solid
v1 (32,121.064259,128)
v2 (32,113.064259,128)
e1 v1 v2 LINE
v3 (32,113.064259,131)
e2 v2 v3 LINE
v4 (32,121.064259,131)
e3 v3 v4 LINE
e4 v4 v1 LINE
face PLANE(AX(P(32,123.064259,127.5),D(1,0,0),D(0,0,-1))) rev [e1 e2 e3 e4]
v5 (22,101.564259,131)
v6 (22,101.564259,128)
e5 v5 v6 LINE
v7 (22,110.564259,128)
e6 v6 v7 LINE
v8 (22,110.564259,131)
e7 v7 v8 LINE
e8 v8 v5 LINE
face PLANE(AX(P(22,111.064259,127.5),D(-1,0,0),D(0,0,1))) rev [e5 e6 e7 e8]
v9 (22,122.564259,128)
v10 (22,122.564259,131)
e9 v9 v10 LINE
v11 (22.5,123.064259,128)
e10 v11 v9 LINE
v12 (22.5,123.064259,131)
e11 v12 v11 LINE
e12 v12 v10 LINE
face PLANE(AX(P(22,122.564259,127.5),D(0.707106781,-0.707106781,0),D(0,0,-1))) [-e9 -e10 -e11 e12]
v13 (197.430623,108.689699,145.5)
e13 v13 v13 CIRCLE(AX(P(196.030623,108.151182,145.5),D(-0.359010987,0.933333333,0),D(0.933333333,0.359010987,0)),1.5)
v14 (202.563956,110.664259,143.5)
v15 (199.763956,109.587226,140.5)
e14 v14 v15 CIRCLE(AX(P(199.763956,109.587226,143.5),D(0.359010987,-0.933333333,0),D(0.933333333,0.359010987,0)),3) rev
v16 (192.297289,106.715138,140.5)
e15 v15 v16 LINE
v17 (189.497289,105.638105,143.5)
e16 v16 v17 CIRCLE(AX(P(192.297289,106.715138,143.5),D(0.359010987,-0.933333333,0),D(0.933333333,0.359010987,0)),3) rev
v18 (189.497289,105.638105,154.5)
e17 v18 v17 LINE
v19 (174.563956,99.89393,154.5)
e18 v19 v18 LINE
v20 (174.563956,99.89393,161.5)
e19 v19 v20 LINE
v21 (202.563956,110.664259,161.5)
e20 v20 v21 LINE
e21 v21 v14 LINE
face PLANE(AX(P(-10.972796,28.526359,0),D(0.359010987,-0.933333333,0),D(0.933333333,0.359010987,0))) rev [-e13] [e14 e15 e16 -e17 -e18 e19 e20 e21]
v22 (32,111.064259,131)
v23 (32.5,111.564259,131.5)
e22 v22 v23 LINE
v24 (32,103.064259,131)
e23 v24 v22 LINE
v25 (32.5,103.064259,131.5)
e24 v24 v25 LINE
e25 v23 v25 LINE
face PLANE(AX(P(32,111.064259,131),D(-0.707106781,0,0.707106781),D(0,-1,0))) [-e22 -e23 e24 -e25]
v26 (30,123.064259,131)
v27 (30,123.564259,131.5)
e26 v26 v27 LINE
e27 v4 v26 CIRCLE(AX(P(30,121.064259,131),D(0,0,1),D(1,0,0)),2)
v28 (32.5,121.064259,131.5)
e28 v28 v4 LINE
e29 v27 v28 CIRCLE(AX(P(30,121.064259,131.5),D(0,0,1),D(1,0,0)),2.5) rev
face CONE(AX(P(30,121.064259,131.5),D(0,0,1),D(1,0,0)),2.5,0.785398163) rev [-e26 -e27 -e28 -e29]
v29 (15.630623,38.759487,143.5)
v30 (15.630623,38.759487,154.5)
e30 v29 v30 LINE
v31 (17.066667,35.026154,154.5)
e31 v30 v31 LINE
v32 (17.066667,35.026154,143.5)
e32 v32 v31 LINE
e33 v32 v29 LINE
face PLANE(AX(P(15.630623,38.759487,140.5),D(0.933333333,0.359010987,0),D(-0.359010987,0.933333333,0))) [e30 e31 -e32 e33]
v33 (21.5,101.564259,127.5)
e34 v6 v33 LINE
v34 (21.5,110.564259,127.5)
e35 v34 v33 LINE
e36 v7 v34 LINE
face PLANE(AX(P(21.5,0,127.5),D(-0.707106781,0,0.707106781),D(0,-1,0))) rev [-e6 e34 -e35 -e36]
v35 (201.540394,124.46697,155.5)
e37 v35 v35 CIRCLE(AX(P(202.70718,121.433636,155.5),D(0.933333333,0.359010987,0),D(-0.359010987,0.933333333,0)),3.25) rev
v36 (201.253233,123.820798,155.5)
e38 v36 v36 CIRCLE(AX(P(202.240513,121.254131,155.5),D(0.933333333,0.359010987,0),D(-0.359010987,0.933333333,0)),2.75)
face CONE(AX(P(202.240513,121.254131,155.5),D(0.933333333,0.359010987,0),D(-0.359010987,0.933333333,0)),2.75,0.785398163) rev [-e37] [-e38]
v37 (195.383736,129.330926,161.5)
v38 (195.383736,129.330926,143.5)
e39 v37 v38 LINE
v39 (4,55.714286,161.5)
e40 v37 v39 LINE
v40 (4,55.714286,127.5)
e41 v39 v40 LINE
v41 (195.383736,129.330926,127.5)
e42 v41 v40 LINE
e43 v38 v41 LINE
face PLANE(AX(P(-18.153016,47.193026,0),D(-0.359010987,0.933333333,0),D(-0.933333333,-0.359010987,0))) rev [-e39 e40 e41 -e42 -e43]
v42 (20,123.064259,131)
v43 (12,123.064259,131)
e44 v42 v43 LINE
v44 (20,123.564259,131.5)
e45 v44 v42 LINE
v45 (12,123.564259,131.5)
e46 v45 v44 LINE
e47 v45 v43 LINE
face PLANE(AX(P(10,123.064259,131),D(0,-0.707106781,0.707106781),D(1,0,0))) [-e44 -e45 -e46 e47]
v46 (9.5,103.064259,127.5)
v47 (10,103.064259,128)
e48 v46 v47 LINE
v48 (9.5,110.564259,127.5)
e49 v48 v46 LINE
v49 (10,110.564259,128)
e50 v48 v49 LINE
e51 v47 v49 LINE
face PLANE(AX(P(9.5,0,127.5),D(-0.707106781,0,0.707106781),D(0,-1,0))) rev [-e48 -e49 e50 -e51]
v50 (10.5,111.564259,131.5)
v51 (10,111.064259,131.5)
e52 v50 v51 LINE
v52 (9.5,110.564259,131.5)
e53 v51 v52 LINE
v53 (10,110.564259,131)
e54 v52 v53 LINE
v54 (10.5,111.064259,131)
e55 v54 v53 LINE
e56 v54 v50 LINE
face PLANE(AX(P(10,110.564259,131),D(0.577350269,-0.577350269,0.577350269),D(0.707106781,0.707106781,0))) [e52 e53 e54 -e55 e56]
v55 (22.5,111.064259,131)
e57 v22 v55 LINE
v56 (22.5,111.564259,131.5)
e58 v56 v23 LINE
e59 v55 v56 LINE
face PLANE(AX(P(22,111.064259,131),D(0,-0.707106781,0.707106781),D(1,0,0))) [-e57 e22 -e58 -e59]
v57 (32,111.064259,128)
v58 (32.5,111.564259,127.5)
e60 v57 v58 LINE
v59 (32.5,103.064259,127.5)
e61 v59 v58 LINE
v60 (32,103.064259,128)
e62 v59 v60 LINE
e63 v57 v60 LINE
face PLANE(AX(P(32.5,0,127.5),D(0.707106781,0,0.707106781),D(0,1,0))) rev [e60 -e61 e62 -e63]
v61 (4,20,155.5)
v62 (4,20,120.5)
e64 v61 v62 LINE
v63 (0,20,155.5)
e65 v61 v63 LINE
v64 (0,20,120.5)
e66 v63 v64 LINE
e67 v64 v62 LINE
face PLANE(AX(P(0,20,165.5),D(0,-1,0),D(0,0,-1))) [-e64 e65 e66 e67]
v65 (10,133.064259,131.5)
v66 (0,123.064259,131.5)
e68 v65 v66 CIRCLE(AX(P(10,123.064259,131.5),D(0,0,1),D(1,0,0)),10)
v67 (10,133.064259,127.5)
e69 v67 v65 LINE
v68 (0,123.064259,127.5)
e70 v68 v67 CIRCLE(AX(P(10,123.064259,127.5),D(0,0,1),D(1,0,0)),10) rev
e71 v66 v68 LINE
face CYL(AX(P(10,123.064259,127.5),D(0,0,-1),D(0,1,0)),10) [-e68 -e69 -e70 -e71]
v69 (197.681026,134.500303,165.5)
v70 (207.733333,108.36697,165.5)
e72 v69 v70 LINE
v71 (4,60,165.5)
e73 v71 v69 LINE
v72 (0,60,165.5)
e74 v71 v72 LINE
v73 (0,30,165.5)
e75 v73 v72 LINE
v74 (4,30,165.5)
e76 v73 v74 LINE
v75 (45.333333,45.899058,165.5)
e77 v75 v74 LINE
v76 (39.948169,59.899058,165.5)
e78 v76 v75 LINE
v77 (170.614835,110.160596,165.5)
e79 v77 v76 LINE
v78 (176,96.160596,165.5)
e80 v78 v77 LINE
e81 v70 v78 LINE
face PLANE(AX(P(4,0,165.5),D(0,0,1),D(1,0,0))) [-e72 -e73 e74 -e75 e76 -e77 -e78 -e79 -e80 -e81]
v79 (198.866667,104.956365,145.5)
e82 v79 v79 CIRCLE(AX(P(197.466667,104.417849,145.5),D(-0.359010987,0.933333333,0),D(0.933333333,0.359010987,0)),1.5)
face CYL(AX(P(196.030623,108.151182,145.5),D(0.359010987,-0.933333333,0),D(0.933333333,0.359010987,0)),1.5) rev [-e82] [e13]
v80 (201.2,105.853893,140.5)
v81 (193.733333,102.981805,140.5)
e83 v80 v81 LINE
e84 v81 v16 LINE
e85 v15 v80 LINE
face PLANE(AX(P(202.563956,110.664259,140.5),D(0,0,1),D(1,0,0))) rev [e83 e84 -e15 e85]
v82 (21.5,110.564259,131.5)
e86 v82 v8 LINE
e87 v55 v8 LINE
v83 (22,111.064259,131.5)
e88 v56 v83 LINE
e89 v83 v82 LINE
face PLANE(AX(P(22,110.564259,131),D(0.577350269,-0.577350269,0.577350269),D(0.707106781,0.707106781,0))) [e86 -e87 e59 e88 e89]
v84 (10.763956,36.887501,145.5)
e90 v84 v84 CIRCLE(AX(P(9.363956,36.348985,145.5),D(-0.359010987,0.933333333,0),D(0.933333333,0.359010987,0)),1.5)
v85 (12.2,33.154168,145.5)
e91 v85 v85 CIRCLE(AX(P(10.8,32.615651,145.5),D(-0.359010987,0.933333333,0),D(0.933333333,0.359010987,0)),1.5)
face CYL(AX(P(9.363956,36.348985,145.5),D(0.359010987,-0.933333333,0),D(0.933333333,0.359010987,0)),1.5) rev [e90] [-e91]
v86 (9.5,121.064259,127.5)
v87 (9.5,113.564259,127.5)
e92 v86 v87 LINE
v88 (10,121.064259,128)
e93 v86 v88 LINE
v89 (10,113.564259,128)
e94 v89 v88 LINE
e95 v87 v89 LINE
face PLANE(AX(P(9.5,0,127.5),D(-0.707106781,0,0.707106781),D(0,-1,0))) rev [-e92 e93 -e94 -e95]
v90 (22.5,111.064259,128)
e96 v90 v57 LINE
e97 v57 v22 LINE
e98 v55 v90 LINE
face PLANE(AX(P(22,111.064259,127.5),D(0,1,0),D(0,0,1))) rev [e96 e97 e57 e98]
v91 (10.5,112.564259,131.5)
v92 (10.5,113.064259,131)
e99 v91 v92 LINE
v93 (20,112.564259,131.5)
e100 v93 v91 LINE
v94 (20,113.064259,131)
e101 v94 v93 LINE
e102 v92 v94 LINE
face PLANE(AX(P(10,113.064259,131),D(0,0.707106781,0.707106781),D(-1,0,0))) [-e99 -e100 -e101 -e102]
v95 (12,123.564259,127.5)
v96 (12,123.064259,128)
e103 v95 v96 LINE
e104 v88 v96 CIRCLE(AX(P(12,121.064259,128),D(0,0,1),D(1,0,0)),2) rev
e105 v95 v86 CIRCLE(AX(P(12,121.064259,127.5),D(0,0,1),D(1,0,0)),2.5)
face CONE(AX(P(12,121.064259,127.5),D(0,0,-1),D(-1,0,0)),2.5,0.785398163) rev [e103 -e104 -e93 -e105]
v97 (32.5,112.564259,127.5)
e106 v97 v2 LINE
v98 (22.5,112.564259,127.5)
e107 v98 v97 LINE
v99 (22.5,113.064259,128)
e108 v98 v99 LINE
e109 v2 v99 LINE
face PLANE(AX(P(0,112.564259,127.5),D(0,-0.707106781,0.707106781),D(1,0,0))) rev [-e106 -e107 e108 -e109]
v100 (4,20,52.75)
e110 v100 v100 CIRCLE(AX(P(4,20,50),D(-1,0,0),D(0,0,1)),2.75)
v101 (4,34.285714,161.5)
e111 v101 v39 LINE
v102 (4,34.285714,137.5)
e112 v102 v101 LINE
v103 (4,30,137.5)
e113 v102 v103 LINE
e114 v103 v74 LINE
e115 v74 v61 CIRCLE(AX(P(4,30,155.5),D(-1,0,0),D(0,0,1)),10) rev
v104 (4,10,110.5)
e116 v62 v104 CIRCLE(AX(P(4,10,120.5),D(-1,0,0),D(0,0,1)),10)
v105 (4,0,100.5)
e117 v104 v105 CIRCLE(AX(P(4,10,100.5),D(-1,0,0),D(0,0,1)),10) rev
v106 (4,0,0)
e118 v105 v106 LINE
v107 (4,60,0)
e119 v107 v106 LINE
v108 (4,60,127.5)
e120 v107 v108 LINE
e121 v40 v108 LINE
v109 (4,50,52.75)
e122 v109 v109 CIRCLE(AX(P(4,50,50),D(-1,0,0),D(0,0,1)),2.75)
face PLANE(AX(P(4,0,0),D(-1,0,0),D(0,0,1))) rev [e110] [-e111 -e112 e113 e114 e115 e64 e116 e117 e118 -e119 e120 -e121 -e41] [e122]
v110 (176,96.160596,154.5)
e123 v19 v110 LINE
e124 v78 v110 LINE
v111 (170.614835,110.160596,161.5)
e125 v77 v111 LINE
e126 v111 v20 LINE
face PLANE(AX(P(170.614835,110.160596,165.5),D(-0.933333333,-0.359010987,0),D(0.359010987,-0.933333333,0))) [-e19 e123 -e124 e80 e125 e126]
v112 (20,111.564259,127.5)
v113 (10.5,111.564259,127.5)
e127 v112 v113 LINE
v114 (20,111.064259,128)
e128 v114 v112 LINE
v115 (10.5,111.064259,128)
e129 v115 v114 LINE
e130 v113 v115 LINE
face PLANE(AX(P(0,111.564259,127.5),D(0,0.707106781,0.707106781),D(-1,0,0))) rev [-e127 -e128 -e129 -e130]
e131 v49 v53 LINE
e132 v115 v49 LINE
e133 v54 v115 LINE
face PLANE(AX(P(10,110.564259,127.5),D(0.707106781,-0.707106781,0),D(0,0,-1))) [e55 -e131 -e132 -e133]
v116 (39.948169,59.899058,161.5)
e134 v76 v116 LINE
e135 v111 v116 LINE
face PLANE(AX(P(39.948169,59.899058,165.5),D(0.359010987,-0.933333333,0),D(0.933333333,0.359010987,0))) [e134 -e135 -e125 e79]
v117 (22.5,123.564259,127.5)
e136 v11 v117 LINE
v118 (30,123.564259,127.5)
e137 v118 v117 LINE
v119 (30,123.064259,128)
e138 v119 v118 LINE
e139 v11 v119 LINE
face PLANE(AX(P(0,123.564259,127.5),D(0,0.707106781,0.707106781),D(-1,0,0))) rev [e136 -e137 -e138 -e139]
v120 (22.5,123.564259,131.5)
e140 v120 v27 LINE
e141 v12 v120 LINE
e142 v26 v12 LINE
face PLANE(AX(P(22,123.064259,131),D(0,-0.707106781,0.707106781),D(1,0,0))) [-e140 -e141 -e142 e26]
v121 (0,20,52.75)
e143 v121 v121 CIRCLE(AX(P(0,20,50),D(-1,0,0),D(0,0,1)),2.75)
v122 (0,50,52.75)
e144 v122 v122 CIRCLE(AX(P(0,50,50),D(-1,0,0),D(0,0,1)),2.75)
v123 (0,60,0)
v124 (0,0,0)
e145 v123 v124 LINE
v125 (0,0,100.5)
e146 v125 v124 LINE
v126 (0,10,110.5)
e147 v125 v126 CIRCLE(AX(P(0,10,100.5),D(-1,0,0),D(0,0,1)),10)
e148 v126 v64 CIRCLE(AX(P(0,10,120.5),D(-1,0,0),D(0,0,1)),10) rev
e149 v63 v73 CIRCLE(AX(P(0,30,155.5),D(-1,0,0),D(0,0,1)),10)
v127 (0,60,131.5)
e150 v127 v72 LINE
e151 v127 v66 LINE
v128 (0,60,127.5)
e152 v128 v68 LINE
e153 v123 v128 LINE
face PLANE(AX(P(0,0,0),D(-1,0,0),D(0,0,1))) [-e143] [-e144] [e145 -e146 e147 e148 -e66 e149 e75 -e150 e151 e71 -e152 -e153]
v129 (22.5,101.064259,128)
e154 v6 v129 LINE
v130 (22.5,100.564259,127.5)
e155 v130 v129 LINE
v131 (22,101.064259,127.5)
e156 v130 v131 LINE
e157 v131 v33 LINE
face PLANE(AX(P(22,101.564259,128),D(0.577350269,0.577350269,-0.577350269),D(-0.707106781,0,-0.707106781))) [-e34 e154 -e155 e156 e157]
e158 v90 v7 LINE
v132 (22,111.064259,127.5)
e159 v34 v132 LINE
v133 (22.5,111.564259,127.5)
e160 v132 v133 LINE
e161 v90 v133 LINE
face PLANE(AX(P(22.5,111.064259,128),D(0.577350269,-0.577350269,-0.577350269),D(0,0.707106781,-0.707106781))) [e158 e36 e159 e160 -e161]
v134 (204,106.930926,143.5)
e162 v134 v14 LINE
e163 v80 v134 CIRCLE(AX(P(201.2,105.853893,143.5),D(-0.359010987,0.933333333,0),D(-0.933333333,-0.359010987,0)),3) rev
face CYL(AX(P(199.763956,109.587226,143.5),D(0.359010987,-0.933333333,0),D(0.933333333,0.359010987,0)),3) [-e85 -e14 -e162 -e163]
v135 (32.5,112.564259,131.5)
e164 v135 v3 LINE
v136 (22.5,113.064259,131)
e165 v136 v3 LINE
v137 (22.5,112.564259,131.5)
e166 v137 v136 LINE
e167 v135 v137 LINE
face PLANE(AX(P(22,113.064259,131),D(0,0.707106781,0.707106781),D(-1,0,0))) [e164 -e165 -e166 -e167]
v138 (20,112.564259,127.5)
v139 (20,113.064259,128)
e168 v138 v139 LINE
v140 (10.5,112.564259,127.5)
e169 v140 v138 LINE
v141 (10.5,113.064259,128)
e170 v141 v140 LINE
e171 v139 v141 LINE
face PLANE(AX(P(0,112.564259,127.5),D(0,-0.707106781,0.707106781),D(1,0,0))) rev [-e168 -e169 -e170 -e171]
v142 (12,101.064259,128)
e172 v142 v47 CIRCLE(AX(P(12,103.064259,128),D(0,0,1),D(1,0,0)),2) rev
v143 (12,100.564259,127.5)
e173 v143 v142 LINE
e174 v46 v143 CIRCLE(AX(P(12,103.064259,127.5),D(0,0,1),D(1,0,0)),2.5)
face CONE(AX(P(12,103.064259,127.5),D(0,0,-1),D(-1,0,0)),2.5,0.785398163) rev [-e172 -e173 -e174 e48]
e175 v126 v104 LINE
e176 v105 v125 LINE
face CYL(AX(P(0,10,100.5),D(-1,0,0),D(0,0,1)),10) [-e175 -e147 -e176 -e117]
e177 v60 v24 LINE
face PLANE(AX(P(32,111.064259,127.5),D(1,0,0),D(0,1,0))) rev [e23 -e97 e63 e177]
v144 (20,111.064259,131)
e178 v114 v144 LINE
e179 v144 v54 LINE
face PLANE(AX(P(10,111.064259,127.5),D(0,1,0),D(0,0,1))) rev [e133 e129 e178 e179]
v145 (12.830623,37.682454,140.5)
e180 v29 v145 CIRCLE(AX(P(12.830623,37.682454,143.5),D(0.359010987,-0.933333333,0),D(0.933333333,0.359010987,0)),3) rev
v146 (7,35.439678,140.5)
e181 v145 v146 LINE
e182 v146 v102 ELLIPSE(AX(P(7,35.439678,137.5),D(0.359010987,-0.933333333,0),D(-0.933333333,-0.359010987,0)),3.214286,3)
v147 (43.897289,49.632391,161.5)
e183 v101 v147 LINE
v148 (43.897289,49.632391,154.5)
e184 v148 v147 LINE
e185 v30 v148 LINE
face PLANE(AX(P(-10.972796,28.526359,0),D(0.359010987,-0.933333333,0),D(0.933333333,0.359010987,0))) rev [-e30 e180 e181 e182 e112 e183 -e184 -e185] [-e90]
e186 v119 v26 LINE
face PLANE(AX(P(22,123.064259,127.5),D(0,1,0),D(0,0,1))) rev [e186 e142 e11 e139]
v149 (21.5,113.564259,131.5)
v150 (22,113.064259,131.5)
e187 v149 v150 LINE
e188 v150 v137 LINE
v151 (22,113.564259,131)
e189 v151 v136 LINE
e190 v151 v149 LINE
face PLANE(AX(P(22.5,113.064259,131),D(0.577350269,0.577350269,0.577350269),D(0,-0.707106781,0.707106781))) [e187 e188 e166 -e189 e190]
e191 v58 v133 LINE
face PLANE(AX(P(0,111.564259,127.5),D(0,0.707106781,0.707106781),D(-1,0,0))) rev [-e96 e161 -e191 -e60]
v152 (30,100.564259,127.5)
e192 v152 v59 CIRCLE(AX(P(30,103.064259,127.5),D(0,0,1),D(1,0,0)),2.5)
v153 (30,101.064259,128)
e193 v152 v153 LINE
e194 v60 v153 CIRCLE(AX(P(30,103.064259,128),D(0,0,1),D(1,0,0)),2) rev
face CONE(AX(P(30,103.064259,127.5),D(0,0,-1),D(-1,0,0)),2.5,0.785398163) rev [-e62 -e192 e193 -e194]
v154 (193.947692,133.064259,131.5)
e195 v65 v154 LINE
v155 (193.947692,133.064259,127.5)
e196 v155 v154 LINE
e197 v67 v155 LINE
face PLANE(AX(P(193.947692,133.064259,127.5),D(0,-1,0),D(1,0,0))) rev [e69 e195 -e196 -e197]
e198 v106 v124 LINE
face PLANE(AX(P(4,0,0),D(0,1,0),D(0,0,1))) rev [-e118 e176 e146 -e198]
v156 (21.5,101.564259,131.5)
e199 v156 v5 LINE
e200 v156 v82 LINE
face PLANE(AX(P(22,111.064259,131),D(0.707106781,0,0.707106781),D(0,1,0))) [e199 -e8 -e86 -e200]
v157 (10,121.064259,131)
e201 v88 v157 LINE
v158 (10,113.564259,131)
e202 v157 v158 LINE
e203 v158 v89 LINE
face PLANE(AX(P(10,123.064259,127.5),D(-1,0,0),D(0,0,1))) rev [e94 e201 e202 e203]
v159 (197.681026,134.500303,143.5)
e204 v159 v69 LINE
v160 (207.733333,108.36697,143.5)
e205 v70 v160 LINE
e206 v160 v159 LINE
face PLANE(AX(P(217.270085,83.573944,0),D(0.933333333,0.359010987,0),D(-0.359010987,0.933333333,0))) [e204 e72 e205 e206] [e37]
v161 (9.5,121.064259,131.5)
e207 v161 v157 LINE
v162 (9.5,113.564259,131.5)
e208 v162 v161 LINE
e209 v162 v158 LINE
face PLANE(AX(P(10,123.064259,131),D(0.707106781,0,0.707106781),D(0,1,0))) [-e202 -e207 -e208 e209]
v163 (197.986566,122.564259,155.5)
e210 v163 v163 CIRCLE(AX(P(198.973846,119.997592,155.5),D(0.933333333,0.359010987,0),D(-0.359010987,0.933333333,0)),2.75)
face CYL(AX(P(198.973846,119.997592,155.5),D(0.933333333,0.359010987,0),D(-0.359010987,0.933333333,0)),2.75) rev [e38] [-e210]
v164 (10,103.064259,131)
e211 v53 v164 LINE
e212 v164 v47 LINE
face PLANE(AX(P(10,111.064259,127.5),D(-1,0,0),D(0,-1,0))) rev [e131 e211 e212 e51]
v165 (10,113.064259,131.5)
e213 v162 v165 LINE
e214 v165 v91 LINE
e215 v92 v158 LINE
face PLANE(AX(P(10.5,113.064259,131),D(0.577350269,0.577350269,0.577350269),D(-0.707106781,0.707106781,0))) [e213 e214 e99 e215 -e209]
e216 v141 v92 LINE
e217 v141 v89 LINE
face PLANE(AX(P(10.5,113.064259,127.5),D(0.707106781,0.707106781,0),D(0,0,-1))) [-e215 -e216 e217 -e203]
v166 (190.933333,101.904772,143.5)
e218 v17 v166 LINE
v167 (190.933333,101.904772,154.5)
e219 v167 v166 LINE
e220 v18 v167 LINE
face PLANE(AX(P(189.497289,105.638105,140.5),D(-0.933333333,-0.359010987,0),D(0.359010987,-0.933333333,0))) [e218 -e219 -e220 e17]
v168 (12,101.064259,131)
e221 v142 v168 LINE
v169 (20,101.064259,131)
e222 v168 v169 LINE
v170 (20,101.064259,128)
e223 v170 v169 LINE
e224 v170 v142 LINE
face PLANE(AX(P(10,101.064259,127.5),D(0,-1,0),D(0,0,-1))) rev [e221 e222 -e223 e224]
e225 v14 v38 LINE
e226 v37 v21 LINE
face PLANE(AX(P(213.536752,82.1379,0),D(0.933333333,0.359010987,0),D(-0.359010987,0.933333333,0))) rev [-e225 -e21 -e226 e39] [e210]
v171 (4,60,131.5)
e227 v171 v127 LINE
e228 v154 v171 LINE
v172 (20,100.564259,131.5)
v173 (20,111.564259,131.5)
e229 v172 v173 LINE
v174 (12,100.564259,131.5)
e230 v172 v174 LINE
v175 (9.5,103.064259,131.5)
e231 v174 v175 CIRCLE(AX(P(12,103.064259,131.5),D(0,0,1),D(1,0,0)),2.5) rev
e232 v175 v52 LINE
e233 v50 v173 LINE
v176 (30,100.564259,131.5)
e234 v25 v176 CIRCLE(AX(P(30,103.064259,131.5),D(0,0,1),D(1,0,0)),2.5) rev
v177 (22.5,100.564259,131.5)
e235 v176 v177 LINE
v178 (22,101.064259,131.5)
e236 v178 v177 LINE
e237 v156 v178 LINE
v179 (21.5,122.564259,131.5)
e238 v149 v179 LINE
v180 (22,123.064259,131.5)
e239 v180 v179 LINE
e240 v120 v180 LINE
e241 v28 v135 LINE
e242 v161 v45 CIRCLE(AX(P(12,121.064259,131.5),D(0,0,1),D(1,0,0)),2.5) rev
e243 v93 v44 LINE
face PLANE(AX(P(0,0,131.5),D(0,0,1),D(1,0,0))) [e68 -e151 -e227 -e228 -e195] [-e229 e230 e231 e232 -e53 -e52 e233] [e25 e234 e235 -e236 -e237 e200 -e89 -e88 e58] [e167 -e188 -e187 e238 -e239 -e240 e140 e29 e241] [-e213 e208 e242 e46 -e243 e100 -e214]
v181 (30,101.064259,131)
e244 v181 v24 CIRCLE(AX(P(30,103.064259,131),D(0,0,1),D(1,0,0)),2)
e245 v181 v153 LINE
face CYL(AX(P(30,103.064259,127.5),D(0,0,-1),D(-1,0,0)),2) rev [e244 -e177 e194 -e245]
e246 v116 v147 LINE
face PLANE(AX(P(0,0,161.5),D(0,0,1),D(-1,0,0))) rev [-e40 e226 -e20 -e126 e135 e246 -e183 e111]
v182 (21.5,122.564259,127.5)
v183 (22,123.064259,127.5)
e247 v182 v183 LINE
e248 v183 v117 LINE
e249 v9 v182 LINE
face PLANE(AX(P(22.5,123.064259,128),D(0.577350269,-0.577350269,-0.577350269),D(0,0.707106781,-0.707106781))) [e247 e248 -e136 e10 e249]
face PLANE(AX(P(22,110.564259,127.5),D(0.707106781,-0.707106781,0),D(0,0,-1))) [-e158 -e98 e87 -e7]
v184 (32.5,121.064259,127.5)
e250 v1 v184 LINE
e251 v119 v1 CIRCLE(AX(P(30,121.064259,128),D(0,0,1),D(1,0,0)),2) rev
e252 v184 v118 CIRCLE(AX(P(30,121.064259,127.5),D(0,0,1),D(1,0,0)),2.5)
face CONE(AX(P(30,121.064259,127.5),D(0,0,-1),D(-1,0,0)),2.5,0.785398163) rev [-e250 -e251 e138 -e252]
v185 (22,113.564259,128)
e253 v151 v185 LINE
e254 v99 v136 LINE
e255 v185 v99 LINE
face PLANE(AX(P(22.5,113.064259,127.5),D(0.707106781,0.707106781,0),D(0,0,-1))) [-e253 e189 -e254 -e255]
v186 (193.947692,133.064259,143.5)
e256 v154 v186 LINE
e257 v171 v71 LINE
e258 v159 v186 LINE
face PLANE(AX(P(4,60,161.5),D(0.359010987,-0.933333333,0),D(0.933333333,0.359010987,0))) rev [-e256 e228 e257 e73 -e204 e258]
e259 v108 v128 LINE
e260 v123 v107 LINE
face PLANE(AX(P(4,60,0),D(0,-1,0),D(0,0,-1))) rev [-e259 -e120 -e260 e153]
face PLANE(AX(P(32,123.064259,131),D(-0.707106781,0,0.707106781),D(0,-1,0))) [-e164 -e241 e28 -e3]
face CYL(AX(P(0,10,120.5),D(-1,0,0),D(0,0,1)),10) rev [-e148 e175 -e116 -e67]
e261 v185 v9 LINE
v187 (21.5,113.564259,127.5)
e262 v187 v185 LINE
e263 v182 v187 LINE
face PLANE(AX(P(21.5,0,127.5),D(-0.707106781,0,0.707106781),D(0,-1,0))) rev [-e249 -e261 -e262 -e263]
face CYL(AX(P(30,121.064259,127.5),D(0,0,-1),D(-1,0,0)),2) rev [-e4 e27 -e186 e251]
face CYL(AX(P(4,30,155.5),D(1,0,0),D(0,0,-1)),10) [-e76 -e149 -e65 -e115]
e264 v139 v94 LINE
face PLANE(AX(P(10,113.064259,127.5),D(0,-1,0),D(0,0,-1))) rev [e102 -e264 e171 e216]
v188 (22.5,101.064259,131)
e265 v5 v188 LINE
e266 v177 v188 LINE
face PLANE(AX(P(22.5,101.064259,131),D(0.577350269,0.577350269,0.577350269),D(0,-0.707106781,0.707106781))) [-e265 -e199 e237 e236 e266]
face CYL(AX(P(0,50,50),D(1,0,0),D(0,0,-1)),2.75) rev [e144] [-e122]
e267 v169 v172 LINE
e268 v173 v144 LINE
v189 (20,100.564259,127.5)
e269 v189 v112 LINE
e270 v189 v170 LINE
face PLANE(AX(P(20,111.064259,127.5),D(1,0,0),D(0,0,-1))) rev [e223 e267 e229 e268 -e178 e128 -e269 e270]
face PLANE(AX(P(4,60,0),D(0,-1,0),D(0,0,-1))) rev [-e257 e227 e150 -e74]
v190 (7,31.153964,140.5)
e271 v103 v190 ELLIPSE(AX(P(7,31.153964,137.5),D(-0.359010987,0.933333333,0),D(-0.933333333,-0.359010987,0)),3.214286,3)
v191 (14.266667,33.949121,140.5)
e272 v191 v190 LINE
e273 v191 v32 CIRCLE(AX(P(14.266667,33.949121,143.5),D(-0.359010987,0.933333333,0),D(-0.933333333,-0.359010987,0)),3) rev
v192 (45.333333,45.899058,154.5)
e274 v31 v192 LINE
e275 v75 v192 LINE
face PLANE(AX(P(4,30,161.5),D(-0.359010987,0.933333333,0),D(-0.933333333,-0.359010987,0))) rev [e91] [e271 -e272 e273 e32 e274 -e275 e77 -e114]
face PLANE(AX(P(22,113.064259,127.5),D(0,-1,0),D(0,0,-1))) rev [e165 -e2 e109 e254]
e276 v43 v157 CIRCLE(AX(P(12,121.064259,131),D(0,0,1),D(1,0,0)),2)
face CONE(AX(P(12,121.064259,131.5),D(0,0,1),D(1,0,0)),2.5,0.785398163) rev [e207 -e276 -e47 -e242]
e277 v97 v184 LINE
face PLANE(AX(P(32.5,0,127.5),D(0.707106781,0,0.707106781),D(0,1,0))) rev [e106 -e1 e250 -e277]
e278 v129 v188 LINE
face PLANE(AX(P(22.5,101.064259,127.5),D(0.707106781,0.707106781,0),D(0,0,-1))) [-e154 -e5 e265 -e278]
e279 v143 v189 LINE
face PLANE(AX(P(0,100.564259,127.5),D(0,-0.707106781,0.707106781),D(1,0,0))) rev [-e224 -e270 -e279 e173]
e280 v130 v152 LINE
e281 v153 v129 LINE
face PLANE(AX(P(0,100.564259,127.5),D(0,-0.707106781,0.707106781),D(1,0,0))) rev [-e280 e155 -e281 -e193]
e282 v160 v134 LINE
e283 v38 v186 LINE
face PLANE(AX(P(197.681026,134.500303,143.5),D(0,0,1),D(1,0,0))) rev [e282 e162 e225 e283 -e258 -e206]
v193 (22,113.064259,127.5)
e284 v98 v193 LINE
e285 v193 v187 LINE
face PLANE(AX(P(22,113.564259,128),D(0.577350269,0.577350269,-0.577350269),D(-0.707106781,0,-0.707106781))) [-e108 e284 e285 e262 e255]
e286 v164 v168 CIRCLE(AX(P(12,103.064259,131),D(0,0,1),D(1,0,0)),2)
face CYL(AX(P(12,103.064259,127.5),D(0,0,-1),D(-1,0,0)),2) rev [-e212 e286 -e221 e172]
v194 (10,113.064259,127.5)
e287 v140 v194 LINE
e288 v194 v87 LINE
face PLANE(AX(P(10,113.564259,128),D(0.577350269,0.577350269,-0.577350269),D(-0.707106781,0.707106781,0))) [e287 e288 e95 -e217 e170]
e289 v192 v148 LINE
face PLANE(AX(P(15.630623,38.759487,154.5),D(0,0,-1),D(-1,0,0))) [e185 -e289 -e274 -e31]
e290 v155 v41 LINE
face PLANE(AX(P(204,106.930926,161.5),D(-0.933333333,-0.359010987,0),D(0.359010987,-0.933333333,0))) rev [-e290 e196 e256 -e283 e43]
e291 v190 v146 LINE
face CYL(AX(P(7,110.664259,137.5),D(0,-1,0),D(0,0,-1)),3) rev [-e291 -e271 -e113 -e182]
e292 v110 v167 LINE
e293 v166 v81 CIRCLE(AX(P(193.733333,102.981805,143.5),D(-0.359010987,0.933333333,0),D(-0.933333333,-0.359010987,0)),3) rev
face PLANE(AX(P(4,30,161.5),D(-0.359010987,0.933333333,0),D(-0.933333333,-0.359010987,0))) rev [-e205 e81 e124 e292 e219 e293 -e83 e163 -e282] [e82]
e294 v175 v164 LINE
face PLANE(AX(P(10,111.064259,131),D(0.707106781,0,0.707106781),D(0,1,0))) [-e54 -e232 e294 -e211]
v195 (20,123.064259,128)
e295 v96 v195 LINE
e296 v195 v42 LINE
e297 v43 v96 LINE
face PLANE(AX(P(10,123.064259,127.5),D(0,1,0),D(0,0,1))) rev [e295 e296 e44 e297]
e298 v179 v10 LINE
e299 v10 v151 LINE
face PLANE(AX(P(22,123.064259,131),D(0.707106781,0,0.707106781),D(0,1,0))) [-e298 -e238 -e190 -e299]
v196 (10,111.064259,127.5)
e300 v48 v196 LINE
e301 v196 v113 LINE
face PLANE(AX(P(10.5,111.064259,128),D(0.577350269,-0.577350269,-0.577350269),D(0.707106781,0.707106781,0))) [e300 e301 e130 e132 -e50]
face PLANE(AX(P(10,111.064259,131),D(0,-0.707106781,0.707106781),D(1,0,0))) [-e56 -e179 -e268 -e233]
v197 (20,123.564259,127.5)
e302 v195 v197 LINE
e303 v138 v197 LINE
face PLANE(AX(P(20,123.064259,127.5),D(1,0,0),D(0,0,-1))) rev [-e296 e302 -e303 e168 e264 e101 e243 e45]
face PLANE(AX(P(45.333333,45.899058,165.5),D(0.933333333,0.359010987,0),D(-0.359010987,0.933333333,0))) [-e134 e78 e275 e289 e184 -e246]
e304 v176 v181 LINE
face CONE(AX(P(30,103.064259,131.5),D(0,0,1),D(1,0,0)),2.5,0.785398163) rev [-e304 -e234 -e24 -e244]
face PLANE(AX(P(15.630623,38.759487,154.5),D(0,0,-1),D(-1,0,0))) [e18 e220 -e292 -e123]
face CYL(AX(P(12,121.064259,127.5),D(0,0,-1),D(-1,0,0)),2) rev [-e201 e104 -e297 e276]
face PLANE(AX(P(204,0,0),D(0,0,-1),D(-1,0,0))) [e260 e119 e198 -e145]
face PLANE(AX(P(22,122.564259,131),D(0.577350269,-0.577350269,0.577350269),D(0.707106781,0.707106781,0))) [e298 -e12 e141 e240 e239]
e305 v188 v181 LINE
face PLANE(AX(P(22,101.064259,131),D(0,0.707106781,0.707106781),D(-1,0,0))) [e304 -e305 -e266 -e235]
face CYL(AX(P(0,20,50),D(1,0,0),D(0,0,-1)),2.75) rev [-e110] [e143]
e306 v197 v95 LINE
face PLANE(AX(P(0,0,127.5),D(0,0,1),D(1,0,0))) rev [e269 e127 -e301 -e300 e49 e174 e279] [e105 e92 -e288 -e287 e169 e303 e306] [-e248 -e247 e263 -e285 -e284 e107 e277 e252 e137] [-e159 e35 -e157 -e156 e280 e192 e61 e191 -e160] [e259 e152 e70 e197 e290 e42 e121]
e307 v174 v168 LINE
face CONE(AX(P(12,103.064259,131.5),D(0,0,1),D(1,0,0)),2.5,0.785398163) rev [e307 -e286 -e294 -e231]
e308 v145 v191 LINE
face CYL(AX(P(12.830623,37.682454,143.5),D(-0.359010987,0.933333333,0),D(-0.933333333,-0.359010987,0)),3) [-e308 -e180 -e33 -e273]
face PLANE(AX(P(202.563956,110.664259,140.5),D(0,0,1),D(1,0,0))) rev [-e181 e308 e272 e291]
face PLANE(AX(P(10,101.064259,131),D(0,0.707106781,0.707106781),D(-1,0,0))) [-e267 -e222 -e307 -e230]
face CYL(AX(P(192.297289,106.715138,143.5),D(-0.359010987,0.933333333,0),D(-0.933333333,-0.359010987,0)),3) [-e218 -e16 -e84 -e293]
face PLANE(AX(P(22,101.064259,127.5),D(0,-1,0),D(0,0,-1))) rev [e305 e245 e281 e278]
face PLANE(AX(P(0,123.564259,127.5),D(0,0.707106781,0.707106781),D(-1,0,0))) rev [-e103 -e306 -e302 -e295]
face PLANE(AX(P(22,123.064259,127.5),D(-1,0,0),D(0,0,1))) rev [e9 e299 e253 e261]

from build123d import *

# Parameters (mm, degrees)
SKETCH_1_W               = 165.5
SKETCH_1_H               = 60
EXTRUDE_1_DEPTH          = 4
EXTRUDE_2_DEPTH          = 4
SKETCH_3_W               = 214.285714285
SKETCH_3_H               = 25
EXTRUDE_5_DEPTH          = 4
SKETCH_4_R               = 2.75
CUT_EXTRUDE_1_DEPTH      = 4
SKETCH_5_W               = 55
SKETCH_5_H               = 20
CUT_EXTRUDE_2_DEPTH      = 4
FILLET_1_R               = 10
SKETCH_6_W               = 186.285714285
SKETCH_6_H               = 14
CUT_EXTRUDE_3_DEPTH      = 4
SKETCH_7_R               = 1.5
CUT_EXTRUDE_4_DEPTH      = 4
FILLET_2_R               = 3
CUT_EXTRUDE_5_DEPTH      = 4
FILLET_1_OF_MIRROR_1_R   = 10
FILLET_2_OF_MIRROR_1_R   = 3
CUT_EXTRUDE_6_DEPTH      = 292.712781796
CUT_EXTRUDE_6_DEPTH_BACK = 4
SKETCH_9_W               = 205.055051827
SKETCH_9_H               = 163.821453507
CUT_EXTRUDE_7_DEPTH      = 293.240221501
SKETCH_11_W              = 207.248718004
SKETCH_11_H              = 34
EXTRUDE_6_DEPTH          = 4
SKETCH_12_W              = 22
SKETCH_12_H              = 28
EXTRUDE_7_DEPTH          = 4
SKETCH_13_R              = 2.75
CUT_EXTRUDE_8_DEPTH      = 4
EXTRUDE_8_DEPTH          = 4
FILLET_3_R               = 10
SKETCH_15_W              = 10
SKETCH_15_H              = 10
CUT_EXTRUDE_9_DEPTH      = 4
FILLET_4_R               = 2
CHAMFER_1_SIZE           = 0.5
CHAMFER_2_SIZE           = 0.5


with BuildPart() as part:
    # 草图1 → 凸台-拉伸1 (new body)
    with BuildSketch(Plane(origin=(0, 0, 0), x_dir=(0, 0, -1), z_dir=(1, 0, 0))):
        with Locations((82.75, 30)):
            Rectangle(SKETCH_1_W, SKETCH_1_H)
    extrude_1 = extrude(amount=EXTRUDE_1_DEPTH)

    # 草图2 → 凸台-拉伸2 (add)
    with BuildSketch(Plane(origin=(0, 0, -165.5), x_dir=(-1, 0, 0), z_dir=(0, 0, -1))):
        Polygon((-4, 30), (-204, 106.930925816), (-193.94769236, 133.06425915), (-4, 60), align=None)
    extrude_2 = extrude(amount=-EXTRUDE_2_DEPTH)

    # 草图3 → 凸台-拉伸5 (add)
    with BuildSketch(Plane(origin=(-9.536752084, 24.793025648, 0), x_dir=(0.9333333333333335, 0.3590109871422999, 0), z_dir=(0.3590109871422999, -0.9333333333333335, 0))):
        with Locations((121.646520091, -153)):
            Rectangle(SKETCH_3_W, SKETCH_3_H)
    extrude_5 = extrude(amount=-EXTRUDE_5_DEPTH)

    # 草图4 → 切除-拉伸1 (cut)
    with BuildSketch(Plane(origin=(4, 0, 0), x_dir=(0, 0, -1), z_dir=(1, 0, 0))):
        with Locations((50, 50)):
            Circle(SKETCH_4_R)
        with Locations((50, 20)):
            Circle(SKETCH_4_R)
    cut_extrude_1 = extrude(amount=-CUT_EXTRUDE_1_DEPTH, mode=Mode.SUBTRACT)

    # 草图5 → 切除-拉伸2 (cut)
    with BuildSketch(Plane(origin=(4, 0, 0), x_dir=(0, 0, -1), z_dir=(1, 0, 0))):
        with Locations((138, 10)):
            Rectangle(SKETCH_5_W, SKETCH_5_H)
    cut_extrude_2 = extrude(amount=-CUT_EXTRUDE_2_DEPTH, mode=Mode.SUBTRACT)

    # 圆角1
    fillet_1_edges = [part.edges().sort_by_distance(p)[0] for p in [
        (2, 20, -165.5),
        (2, 20, -110.5),
        (2, 0, -110.5),
    ]]
    fillet(fillet_1_edges, radius=FILLET_1_R - 0.0001)  # a hair under: the kernel refuses the full size

    # 草图6 → 切除-拉伸3 (cut)
    with BuildSketch(Plane(origin=(-9.536752084, 24.793025648, 0), x_dir=(0.9333333333333335, 0.35901098714229984, 0), z_dir=(0.35901098714229984, -0.9333333333333335, 0))):
        with Locations((121.646520091, -147.5)):
            Rectangle(SKETCH_6_W, SKETCH_6_H)
    cut_extrude_3 = extrude(amount=-CUT_EXTRUDE_3_DEPTH, mode=Mode.SUBTRACT)

    # 草图7 → 切除-拉伸4 (cut)
    with BuildSketch(Plane(origin=(-9.536752084, 24.793025648, 0), x_dir=(0.9333333333333335, 0.35901098714229984, 0), z_dir=(0.35901098714229984, -0.9333333333333335, 0))):
        with Locations((221.789377233, -145.5)):
            Circle(SKETCH_7_R)
        with Locations((21.789377233, -145.5)):
            Circle(SKETCH_7_R)
    cut_extrude_4 = extrude(amount=-CUT_EXTRUDE_4_DEPTH, mode=Mode.SUBTRACT)

    # 圆角2
    fillet_2_edges = [part.edges().sort_by_distance(p)[0] for p in [
        (4, 32.142857143, -140.5),
        (203.281978026, 108.797592483, -140.5),
        (16.348644692, 36.892820487, -140.5),
        (190.215311359, 103.771438663, -140.5),
    ]]
    fillet(fillet_2_edges, radius=FILLET_2_R)

    # 草图8 → 切除-拉伸5 (cut)
    with BuildSketch(Plane.XY.offset(-161.5)):
        Polygon((45.333333333, 45.899058002), (39.948168526, 59.899058002), (170.614835193, 110.160596202), (176, 96.160596202), align=None)
    cut_extrude_5 = extrude(amount=-CUT_EXTRUDE_5_DEPTH, mode=Mode.SUBTRACT)

    # 镜向1: 凸台-拉伸1, 凸台-拉伸2, 凸台-拉伸5, 切除-拉伸1, 切除-拉伸2, 切除-拉伸3, 切除-拉伸4, 切除-拉伸5 across plane
    add(extrude_1.mirror(Plane.XY))
    add(extrude_2.mirror(Plane.XY))
    add(extrude_5.mirror(Plane.XY))
    add(cut_extrude_1.mirror(Plane.XY), mode=Mode.SUBTRACT)
    add(cut_extrude_2.mirror(Plane.XY), mode=Mode.SUBTRACT)
    add(cut_extrude_3.mirror(Plane.XY), mode=Mode.SUBTRACT)
    add(cut_extrude_4.mirror(Plane.XY), mode=Mode.SUBTRACT)
    add(cut_extrude_5.mirror(Plane.XY), mode=Mode.SUBTRACT)

    # 圆角1 of 镜向1
    fillet_1_of_mirror_1_edges = [part.edges().sort_by_distance(p)[0] for p in [
        (2, 20, 165.5),
        (2, 20, 110.5),
        (2, 0, 110.5),
    ]]
    fillet(fillet_1_of_mirror_1_edges, radius=FILLET_1_OF_MIRROR_1_R - 0.0001)  # a hair under: the kernel refuses the full size

    # 圆角2 of 镜向1
    fillet_2_of_mirror_1_edges = [part.edges().sort_by_distance(p)[0] for p in [
        (4, 32.142857143, 140.5),
        (203.281978026, 108.797592483, 140.5),
        (16.348644692, 36.892820487, 140.5),
        (190.215311359, 103.771438663, 140.5),
    ]]
    fillet(fillet_2_of_mirror_1_edges, radius=FILLET_2_OF_MIRROR_1_R)

    # 草图9 → 切除-拉伸6 (cut, two sides: drawn at the far end of the back side and taken through both)
    with BuildSketch(Plane(origin=(4, 0, 0), x_dir=(0, 0, -1), z_dir=(1, 0, 0)).offset(-CUT_EXTRUDE_6_DEPTH_BACK)):
        with Locations((102.527525913, 81.910726754)):
            Rectangle(SKETCH_9_W, SKETCH_9_H)
    extrude(amount=CUT_EXTRUDE_6_DEPTH + CUT_EXTRUDE_6_DEPTH_BACK, mode=Mode.SUBTRACT)

    # 草图10 → 切除-拉伸7 (cut, through all)
    with BuildSketch(Plane.XY.offset(161.5)):
        Polygon((174.563956051, 99.893929535), (43.897289385, 49.632391335), (45.333333333, 45.899058002), (176, 96.160596202), align=None)
    extrude(amount=-CUT_EXTRUDE_7_DEPTH, mode=Mode.SUBTRACT)

    # 草图11 → 凸台-拉伸6 (add)
    with BuildSketch(Plane(origin=(-19.589059724, 50.926358981, 0), x_dir=(0.9333333333333335, 0.3590109871422999, 0), z_dir=(-0.3590109871422999, 0.9333333333333335, 0))):
        with Locations((125.165018231, -148.5)):
            Rectangle(SKETCH_11_W, SKETCH_11_H)
    extrude(amount=-EXTRUDE_6_DEPTH)

    # 草图12 → 凸台-拉伸7 (add)
    with BuildSketch(Plane(origin=(213.536752084, 82.137900168, 0), x_dir=(0, 0, -1), z_dir=(0.9333333333333338, 0.35901098714229945, 0))):
        with Locations((-154.5, 40.563956051)):
            Rectangle(SKETCH_12_W, SKETCH_12_H)
    extrude(amount=EXTRUDE_7_DEPTH)

    # 草图13 → 切除-拉伸8 (cut)
    with BuildSketch(Plane(origin=(217.270085418, 83.573944117, 0), x_dir=(0, 0, -1), z_dir=(0.9333333333333338, 0.35901098714229945, 0))):
        with Locations(Location((-155.5, 40.563956051, 0), (0, 0, 90))):
            Circle(SKETCH_13_R)
    extrude(amount=-CUT_EXTRUDE_8_DEPTH, mode=Mode.SUBTRACT)

    # 草图14 → 凸台-拉伸8 (add)
    with BuildSketch(Plane(origin=(0, 0, 131.5), x_dir=(-1, 0, 0), z_dir=(0, 0, -1))):
        Polygon((-4, 55.714285714), (-4, 60), (0, 60), (0, 133.06425915), (-193.94769236, 133.06425915), (-195.383736309, 129.330925816), align=None)
    extrude(amount=EXTRUDE_8_DEPTH)

    # 圆角3
    fillet_3_edges = [part.edges().sort_by_distance(p)[0] for p in [
        (0, 133.06425915, 129.5),
    ]]
    fillet(fillet_3_edges, radius=FILLET_3_R)

    # 草图15 → 切除-拉伸9 (cut)
    with BuildSketch(Plane.XY.offset(131.5)):
        with Locations((15, 118.06425915)):
            Rectangle(SKETCH_15_W, SKETCH_15_H)
        with Locations((27, 118.06425915)):
            Rectangle(SKETCH_15_W, SKETCH_15_H)
        with Locations((15, 106.06425915)):
            Rectangle(SKETCH_15_W, SKETCH_15_H)
        with Locations((27, 106.06425915)):
            Rectangle(SKETCH_15_W, SKETCH_15_H)
    extrude(amount=-CUT_EXTRUDE_9_DEPTH, mode=Mode.SUBTRACT)

    # 圆角4
    fillet_4_edges = [part.edges().sort_by_distance(p)[0] for p in [
        (32, 123.06425915, 129.5),
        (10, 101.06425915, 129.5),
        (32, 101.06425915, 129.5),
        (10, 123.06425915, 129.5),
    ]]
    fillet(fillet_4_edges, radius=FILLET_4_R)

    # 倒角1
    chamfer_1_edges = [part.edges().sort_by_distance(p)[0] for p in [
        (22, 118.06425915, 127.5),
        (22, 113.06425915, 129.5),
        (22, 123.06425915, 129.5),
        (32, 117.06425915, 127.5),
        (27, 113.06425915, 127.5),
        (22, 118.06425915, 131.5),
        (27, 113.06425915, 131.5),
        (32, 117.06425915, 131.5),
        (10, 107.06425915, 127.5),
        (15, 111.06425915, 127.5),
        (10, 111.06425915, 129.5),
        (10, 107.06425915, 131.5),
        (15, 111.06425915, 131.5),
        (22, 106.06425915, 127.5),
        (22, 101.06425915, 129.5),
        (27, 111.06425915, 127.5),
        (22, 111.06425915, 129.5),
        (26, 101.06425915, 127.5),
        (22, 106.06425915, 131.5),
        (26, 101.06425915, 131.5),
        (27, 111.06425915, 131.5),
        (10, 113.06425915, 129.5),
        (16, 123.06425915, 127.5),
        (15, 113.06425915, 127.5),
        (15, 113.06425915, 131.5),
        (16, 123.06425915, 131.5),
        (26, 123.06425915, 131.5),
        (26, 123.06425915, 127.5),
        (10, 117.06425915, 131.5),
        (10, 117.06425915, 127.5),
        (16, 101.06425915, 131.5),
        (16, 101.06425915, 127.5),
        (32, 107.06425915, 131.5),
        (32, 107.06425915, 127.5),
        (31.414213562, 122.478472712, 131.5),
        (31.414213562, 122.478472712, 127.5),
        (10.585786438, 122.478472712, 131.5),
        (10.585786438, 122.478472712, 127.5),
        (10.585786438, 101.650045587, 131.5),
        (10.585786438, 101.650045587, 127.5),
        (31.414213562, 101.650045587, 131.5),
        (31.414213562, 101.650045587, 127.5),
    ]]
    chamfer(chamfer_1_edges, length=CHAMFER_1_SIZE)

    # 倒角2
    chamfer_2_edges = [part.edges().sort_by_distance(p)[0] for p in [
        (203.694459728, 118.866969765, 155.5),
    ]]
    chamfer(chamfer_2_edges, length=CHAMFER_2_SIZE)


solid = part.part
